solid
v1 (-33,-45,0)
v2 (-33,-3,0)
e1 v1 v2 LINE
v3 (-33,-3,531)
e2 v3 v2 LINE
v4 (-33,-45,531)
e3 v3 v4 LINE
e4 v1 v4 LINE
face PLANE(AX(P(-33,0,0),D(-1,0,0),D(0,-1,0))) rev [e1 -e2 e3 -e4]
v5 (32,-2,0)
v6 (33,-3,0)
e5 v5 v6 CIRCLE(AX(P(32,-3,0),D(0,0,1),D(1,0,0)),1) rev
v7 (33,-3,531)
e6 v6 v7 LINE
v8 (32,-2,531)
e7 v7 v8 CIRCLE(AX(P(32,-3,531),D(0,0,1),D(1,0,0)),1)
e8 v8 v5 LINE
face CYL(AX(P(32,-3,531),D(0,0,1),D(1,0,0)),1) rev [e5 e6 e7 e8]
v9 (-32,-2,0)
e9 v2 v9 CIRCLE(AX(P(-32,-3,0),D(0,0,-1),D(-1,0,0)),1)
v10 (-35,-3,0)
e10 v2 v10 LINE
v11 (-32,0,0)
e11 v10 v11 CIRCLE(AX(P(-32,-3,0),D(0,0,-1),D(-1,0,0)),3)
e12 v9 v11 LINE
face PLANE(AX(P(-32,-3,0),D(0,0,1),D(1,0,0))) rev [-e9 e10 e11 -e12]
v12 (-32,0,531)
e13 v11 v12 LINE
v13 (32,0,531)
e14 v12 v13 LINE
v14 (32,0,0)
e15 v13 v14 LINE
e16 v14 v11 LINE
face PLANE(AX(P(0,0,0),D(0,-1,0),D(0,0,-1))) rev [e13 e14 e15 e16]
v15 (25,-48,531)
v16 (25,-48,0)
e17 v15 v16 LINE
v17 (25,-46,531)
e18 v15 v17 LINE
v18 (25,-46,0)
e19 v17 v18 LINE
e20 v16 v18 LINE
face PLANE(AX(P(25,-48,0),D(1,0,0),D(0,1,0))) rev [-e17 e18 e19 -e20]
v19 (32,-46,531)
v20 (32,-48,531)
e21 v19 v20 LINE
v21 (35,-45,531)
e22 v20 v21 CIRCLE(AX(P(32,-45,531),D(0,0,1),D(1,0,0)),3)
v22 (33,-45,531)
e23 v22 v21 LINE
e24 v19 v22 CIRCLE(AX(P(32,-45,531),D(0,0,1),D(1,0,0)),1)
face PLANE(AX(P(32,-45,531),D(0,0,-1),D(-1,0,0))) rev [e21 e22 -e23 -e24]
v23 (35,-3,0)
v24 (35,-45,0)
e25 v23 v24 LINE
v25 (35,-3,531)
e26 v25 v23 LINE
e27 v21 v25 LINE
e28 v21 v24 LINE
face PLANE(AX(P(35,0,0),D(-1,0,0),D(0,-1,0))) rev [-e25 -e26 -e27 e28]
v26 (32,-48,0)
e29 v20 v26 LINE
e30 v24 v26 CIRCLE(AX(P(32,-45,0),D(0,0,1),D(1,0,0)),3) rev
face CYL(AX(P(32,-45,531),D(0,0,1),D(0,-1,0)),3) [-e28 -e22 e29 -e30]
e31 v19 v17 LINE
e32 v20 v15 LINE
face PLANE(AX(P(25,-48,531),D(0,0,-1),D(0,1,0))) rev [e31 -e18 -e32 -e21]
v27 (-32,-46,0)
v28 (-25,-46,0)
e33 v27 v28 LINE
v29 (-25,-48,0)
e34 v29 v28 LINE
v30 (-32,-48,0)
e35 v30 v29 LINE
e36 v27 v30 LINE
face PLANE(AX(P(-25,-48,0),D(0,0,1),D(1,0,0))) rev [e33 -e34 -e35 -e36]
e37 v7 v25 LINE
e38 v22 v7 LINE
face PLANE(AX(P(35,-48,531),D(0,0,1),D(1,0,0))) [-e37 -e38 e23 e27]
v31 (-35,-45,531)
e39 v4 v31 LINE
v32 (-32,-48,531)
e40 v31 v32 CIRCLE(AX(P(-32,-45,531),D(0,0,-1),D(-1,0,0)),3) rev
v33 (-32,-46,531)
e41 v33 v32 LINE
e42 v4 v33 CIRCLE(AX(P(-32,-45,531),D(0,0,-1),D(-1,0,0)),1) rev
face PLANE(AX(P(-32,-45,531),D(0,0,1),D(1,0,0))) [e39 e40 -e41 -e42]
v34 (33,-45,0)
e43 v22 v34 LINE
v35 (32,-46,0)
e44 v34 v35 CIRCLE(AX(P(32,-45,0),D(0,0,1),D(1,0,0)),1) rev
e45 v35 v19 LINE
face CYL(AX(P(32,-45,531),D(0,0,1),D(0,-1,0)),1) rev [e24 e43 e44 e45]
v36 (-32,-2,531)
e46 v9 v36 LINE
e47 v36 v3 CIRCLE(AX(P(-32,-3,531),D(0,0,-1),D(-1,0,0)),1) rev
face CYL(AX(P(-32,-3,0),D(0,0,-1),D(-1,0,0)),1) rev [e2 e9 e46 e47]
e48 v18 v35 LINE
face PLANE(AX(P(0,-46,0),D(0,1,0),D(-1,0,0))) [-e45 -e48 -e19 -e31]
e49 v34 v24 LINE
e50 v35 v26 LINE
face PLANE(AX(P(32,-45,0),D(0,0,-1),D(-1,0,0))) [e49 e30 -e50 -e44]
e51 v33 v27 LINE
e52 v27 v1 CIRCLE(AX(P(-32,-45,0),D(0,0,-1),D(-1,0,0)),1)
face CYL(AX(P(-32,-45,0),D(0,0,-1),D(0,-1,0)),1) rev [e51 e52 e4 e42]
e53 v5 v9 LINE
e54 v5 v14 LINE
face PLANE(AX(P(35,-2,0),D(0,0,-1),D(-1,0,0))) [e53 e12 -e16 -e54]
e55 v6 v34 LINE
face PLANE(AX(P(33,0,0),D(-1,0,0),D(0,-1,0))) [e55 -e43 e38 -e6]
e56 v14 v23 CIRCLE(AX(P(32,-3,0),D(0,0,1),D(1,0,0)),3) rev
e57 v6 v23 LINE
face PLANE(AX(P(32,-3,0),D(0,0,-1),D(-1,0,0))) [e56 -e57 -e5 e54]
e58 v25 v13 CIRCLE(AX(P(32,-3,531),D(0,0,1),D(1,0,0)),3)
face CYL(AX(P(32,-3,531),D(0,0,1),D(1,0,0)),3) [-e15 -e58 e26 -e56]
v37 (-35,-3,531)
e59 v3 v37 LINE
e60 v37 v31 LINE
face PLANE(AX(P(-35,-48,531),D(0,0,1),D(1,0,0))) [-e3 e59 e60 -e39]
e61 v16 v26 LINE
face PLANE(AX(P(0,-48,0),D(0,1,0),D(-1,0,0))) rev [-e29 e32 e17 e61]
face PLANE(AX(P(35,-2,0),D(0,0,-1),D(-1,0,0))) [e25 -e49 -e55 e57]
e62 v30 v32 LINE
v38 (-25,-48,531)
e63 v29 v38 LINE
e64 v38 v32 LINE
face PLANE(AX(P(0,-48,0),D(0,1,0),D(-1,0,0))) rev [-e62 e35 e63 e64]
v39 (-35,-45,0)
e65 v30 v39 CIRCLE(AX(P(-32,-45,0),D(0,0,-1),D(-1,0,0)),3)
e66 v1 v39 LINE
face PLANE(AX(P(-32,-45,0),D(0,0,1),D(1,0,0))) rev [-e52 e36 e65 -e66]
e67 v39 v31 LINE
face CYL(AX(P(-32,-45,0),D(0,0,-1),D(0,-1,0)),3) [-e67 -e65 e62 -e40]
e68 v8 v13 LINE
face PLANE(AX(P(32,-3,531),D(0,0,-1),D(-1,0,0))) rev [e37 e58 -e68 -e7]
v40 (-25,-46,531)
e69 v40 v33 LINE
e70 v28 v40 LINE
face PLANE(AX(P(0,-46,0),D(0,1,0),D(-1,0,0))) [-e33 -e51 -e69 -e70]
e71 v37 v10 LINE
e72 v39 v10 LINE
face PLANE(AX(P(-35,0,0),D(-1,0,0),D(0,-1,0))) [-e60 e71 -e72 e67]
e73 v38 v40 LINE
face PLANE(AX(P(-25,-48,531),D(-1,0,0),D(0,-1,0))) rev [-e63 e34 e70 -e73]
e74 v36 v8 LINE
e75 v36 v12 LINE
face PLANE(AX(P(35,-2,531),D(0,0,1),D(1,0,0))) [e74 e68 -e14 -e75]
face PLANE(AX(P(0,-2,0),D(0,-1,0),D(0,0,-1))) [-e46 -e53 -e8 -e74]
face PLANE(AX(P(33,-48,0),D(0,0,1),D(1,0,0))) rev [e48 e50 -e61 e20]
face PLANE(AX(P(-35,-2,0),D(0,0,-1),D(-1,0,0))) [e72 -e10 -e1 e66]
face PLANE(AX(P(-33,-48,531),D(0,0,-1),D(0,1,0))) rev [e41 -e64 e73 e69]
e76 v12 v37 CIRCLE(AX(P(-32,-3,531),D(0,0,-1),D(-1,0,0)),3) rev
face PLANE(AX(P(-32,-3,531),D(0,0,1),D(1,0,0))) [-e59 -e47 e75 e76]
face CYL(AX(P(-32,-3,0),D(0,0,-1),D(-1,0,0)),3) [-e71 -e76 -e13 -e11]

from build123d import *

# Parameters (mm, degrees)
BASEFLANGE_W                   = 70
BASEFLANGE_H                   = 531
BASE_FLANGE1_DEPTH             = 2
EDGE_FLANGE1_STRIP_W           = 10
EDGE_FLANGE1_STRIP_H           = 2
EDGE_FLANGE1_STRIP_CUT_DEPTH   = 531
EDGE_FLANGE1_STRIP_2_W         = 10
EDGE_FLANGE1_STRIP_2_H         = 2
EDGE_FLANGE1_STRIP_CUT_2_DEPTH = 531
EDGE_FLANGE1_DEPTH             = 531
EDGE_FLANGE1_BEND_DEPTH        = 531
EDGE_FLANGE2_STRIP_W           = 10
EDGE_FLANGE2_STRIP_H           = 2
EDGE_FLANGE2_STRIP_CUT_DEPTH   = 531
EDGE_FLANGE2_STRIP_2_W         = 10
EDGE_FLANGE2_STRIP_2_H         = 2
EDGE_FLANGE2_STRIP_CUT_2_DEPTH = 531
EDGE_FLANGE2_DEPTH             = 531
EDGE_FLANGE2_BEND_DEPTH        = 531


# Sheet-metal steps are written as plain solids
with BuildPart() as part:
    # BaseFlange → Base-Flange1 (new body)
    with BuildSketch(Plane(origin=(0, 0, 0), x_dir=(1, 0, 0), z_dir=(0, 1, 0))):
        with Locations((0, -265.5)):
            Rectangle(BASEFLANGE_W, BASEFLANGE_H)
    extrude(amount=-BASE_FLANGE1_DEPTH)

    # Edge-Flange1 strip (across the edge) → Edge-Flange1 strip cut (cut)
    with BuildSketch(Plane(origin=(-35, -2, 531), x_dir=(1, 0, 0), z_dir=(0, 0, -1))):
        with Locations((-2, -1)):
            Rectangle(EDGE_FLANGE1_STRIP_W, EDGE_FLANGE1_STRIP_H)
    extrude(amount=EDGE_FLANGE1_STRIP_CUT_DEPTH, mode=Mode.SUBTRACT)

    # Edge-Flange1 strip 2 (across the edge) → Edge-Flange1 strip cut 2 (cut)
    with BuildSketch(Plane(origin=(35, -2, 0), x_dir=(-1, 0, 0), z_dir=(0, 0, 1))):
        with Locations((-2, -1)):
            Rectangle(EDGE_FLANGE1_STRIP_2_W, EDGE_FLANGE1_STRIP_2_H)
    extrude(amount=EDGE_FLANGE1_STRIP_CUT_2_DEPTH, mode=Mode.SUBTRACT)

    # Edge-Flange1 section (across the edge) → Edge-Flange1 (add)
    with BuildSketch(Plane(origin=(-35, -2, 531), x_dir=(1, 0, 0), z_dir=(0, 0, -1))):
        with BuildLine():
            Line((0, 1), (0, 46))
            Line((0, 46), (2, 46))
            Line((2, 46), (2, 1))
            ThreePointArc((2, 1), (2.292893219, 0.292893219), (3, 0))
            Line((3, 0), (3, -2))
            ThreePointArc((3, -2), (0.878679656, -1.121320344), (0, 1))
        make_face()
    extrude(amount=EDGE_FLANGE1_DEPTH)

    # Edge-Flange1 section 2 (across the edge) → Edge-Flange1 bend (add)
    with BuildSketch(Plane(origin=(35, -2, 0), x_dir=(-1, 0, 0), z_dir=(0, 0, 1))):
        with BuildLine():
            Line((0, 1), (0, 46))
            Line((0, 46), (2, 46))
            Line((2, 46), (2, 1))
            ThreePointArc((2, 1), (2.292893219, 0.292893219), (3, 0))
            Line((3, 0), (3, -2))
            ThreePointArc((3, -2), (0.878679656, -1.121320344), (0, 1))
        make_face()
    extrude(amount=EDGE_FLANGE1_BEND_DEPTH)

    # Edge-Flange2 strip (across the edge) → Edge-Flange2 strip cut (cut)
    with BuildSketch(Plane(origin=(-33, -48, 531), x_dir=(0, 1, 0), z_dir=(0, 0, -1))):
        with Locations((-2, -1)):
            Rectangle(EDGE_FLANGE2_STRIP_W, EDGE_FLANGE2_STRIP_H)
    extrude(amount=EDGE_FLANGE2_STRIP_CUT_DEPTH, mode=Mode.SUBTRACT)

    # Edge-Flange2 strip 2 (across the edge) → Edge-Flange2 strip cut 2 (cut)
    with BuildSketch(Plane(origin=(33, -48, 0), x_dir=(0, 1, 0), z_dir=(0, 0, 1))):
        with Locations((-2, -1)):
            Rectangle(EDGE_FLANGE2_STRIP_2_W, EDGE_FLANGE2_STRIP_2_H)
    extrude(amount=EDGE_FLANGE2_STRIP_CUT_2_DEPTH, mode=Mode.SUBTRACT)

    # Edge-Flange2 section (across the edge) → Edge-Flange2 (add)
    with BuildSketch(Plane(origin=(-33, -48, 531), x_dir=(0, 1, 0), z_dir=(0, 0, -1))):
        with BuildLine():
            Line((0, 1), (0, 8))
            Line((0, 8), (2, 8))
            Line((2, 8), (2, 1))
            ThreePointArc((2, 1), (2.292893219, 0.292893219), (3, 0))
            Line((3, 0), (3, -2))
            ThreePointArc((3, -2), (0.878679656, -1.121320344), (0, 1))
        make_face()
    extrude(amount=EDGE_FLANGE2_DEPTH)

    # Edge-Flange2 section 2 (across the edge) → Edge-Flange2 bend (add)
    with BuildSketch(Plane(origin=(33, -48, 0), x_dir=(0, 1, 0), z_dir=(0, 0, 1))):
        with BuildLine():
            Line((0, 1), (0, 8))
            Line((0, 8), (2, 8))
            Line((2, 8), (2, 1))
            ThreePointArc((2, 1), (2.292893219, 0.292893219), (3, 0))
            Line((3, 0), (3, -2))
            ThreePointArc((3, -2), (0.878679656, -1.121320344), (0, 1))
        make_face()
    extrude(amount=EDGE_FLANGE2_BEND_DEPTH)


solid = part.part
